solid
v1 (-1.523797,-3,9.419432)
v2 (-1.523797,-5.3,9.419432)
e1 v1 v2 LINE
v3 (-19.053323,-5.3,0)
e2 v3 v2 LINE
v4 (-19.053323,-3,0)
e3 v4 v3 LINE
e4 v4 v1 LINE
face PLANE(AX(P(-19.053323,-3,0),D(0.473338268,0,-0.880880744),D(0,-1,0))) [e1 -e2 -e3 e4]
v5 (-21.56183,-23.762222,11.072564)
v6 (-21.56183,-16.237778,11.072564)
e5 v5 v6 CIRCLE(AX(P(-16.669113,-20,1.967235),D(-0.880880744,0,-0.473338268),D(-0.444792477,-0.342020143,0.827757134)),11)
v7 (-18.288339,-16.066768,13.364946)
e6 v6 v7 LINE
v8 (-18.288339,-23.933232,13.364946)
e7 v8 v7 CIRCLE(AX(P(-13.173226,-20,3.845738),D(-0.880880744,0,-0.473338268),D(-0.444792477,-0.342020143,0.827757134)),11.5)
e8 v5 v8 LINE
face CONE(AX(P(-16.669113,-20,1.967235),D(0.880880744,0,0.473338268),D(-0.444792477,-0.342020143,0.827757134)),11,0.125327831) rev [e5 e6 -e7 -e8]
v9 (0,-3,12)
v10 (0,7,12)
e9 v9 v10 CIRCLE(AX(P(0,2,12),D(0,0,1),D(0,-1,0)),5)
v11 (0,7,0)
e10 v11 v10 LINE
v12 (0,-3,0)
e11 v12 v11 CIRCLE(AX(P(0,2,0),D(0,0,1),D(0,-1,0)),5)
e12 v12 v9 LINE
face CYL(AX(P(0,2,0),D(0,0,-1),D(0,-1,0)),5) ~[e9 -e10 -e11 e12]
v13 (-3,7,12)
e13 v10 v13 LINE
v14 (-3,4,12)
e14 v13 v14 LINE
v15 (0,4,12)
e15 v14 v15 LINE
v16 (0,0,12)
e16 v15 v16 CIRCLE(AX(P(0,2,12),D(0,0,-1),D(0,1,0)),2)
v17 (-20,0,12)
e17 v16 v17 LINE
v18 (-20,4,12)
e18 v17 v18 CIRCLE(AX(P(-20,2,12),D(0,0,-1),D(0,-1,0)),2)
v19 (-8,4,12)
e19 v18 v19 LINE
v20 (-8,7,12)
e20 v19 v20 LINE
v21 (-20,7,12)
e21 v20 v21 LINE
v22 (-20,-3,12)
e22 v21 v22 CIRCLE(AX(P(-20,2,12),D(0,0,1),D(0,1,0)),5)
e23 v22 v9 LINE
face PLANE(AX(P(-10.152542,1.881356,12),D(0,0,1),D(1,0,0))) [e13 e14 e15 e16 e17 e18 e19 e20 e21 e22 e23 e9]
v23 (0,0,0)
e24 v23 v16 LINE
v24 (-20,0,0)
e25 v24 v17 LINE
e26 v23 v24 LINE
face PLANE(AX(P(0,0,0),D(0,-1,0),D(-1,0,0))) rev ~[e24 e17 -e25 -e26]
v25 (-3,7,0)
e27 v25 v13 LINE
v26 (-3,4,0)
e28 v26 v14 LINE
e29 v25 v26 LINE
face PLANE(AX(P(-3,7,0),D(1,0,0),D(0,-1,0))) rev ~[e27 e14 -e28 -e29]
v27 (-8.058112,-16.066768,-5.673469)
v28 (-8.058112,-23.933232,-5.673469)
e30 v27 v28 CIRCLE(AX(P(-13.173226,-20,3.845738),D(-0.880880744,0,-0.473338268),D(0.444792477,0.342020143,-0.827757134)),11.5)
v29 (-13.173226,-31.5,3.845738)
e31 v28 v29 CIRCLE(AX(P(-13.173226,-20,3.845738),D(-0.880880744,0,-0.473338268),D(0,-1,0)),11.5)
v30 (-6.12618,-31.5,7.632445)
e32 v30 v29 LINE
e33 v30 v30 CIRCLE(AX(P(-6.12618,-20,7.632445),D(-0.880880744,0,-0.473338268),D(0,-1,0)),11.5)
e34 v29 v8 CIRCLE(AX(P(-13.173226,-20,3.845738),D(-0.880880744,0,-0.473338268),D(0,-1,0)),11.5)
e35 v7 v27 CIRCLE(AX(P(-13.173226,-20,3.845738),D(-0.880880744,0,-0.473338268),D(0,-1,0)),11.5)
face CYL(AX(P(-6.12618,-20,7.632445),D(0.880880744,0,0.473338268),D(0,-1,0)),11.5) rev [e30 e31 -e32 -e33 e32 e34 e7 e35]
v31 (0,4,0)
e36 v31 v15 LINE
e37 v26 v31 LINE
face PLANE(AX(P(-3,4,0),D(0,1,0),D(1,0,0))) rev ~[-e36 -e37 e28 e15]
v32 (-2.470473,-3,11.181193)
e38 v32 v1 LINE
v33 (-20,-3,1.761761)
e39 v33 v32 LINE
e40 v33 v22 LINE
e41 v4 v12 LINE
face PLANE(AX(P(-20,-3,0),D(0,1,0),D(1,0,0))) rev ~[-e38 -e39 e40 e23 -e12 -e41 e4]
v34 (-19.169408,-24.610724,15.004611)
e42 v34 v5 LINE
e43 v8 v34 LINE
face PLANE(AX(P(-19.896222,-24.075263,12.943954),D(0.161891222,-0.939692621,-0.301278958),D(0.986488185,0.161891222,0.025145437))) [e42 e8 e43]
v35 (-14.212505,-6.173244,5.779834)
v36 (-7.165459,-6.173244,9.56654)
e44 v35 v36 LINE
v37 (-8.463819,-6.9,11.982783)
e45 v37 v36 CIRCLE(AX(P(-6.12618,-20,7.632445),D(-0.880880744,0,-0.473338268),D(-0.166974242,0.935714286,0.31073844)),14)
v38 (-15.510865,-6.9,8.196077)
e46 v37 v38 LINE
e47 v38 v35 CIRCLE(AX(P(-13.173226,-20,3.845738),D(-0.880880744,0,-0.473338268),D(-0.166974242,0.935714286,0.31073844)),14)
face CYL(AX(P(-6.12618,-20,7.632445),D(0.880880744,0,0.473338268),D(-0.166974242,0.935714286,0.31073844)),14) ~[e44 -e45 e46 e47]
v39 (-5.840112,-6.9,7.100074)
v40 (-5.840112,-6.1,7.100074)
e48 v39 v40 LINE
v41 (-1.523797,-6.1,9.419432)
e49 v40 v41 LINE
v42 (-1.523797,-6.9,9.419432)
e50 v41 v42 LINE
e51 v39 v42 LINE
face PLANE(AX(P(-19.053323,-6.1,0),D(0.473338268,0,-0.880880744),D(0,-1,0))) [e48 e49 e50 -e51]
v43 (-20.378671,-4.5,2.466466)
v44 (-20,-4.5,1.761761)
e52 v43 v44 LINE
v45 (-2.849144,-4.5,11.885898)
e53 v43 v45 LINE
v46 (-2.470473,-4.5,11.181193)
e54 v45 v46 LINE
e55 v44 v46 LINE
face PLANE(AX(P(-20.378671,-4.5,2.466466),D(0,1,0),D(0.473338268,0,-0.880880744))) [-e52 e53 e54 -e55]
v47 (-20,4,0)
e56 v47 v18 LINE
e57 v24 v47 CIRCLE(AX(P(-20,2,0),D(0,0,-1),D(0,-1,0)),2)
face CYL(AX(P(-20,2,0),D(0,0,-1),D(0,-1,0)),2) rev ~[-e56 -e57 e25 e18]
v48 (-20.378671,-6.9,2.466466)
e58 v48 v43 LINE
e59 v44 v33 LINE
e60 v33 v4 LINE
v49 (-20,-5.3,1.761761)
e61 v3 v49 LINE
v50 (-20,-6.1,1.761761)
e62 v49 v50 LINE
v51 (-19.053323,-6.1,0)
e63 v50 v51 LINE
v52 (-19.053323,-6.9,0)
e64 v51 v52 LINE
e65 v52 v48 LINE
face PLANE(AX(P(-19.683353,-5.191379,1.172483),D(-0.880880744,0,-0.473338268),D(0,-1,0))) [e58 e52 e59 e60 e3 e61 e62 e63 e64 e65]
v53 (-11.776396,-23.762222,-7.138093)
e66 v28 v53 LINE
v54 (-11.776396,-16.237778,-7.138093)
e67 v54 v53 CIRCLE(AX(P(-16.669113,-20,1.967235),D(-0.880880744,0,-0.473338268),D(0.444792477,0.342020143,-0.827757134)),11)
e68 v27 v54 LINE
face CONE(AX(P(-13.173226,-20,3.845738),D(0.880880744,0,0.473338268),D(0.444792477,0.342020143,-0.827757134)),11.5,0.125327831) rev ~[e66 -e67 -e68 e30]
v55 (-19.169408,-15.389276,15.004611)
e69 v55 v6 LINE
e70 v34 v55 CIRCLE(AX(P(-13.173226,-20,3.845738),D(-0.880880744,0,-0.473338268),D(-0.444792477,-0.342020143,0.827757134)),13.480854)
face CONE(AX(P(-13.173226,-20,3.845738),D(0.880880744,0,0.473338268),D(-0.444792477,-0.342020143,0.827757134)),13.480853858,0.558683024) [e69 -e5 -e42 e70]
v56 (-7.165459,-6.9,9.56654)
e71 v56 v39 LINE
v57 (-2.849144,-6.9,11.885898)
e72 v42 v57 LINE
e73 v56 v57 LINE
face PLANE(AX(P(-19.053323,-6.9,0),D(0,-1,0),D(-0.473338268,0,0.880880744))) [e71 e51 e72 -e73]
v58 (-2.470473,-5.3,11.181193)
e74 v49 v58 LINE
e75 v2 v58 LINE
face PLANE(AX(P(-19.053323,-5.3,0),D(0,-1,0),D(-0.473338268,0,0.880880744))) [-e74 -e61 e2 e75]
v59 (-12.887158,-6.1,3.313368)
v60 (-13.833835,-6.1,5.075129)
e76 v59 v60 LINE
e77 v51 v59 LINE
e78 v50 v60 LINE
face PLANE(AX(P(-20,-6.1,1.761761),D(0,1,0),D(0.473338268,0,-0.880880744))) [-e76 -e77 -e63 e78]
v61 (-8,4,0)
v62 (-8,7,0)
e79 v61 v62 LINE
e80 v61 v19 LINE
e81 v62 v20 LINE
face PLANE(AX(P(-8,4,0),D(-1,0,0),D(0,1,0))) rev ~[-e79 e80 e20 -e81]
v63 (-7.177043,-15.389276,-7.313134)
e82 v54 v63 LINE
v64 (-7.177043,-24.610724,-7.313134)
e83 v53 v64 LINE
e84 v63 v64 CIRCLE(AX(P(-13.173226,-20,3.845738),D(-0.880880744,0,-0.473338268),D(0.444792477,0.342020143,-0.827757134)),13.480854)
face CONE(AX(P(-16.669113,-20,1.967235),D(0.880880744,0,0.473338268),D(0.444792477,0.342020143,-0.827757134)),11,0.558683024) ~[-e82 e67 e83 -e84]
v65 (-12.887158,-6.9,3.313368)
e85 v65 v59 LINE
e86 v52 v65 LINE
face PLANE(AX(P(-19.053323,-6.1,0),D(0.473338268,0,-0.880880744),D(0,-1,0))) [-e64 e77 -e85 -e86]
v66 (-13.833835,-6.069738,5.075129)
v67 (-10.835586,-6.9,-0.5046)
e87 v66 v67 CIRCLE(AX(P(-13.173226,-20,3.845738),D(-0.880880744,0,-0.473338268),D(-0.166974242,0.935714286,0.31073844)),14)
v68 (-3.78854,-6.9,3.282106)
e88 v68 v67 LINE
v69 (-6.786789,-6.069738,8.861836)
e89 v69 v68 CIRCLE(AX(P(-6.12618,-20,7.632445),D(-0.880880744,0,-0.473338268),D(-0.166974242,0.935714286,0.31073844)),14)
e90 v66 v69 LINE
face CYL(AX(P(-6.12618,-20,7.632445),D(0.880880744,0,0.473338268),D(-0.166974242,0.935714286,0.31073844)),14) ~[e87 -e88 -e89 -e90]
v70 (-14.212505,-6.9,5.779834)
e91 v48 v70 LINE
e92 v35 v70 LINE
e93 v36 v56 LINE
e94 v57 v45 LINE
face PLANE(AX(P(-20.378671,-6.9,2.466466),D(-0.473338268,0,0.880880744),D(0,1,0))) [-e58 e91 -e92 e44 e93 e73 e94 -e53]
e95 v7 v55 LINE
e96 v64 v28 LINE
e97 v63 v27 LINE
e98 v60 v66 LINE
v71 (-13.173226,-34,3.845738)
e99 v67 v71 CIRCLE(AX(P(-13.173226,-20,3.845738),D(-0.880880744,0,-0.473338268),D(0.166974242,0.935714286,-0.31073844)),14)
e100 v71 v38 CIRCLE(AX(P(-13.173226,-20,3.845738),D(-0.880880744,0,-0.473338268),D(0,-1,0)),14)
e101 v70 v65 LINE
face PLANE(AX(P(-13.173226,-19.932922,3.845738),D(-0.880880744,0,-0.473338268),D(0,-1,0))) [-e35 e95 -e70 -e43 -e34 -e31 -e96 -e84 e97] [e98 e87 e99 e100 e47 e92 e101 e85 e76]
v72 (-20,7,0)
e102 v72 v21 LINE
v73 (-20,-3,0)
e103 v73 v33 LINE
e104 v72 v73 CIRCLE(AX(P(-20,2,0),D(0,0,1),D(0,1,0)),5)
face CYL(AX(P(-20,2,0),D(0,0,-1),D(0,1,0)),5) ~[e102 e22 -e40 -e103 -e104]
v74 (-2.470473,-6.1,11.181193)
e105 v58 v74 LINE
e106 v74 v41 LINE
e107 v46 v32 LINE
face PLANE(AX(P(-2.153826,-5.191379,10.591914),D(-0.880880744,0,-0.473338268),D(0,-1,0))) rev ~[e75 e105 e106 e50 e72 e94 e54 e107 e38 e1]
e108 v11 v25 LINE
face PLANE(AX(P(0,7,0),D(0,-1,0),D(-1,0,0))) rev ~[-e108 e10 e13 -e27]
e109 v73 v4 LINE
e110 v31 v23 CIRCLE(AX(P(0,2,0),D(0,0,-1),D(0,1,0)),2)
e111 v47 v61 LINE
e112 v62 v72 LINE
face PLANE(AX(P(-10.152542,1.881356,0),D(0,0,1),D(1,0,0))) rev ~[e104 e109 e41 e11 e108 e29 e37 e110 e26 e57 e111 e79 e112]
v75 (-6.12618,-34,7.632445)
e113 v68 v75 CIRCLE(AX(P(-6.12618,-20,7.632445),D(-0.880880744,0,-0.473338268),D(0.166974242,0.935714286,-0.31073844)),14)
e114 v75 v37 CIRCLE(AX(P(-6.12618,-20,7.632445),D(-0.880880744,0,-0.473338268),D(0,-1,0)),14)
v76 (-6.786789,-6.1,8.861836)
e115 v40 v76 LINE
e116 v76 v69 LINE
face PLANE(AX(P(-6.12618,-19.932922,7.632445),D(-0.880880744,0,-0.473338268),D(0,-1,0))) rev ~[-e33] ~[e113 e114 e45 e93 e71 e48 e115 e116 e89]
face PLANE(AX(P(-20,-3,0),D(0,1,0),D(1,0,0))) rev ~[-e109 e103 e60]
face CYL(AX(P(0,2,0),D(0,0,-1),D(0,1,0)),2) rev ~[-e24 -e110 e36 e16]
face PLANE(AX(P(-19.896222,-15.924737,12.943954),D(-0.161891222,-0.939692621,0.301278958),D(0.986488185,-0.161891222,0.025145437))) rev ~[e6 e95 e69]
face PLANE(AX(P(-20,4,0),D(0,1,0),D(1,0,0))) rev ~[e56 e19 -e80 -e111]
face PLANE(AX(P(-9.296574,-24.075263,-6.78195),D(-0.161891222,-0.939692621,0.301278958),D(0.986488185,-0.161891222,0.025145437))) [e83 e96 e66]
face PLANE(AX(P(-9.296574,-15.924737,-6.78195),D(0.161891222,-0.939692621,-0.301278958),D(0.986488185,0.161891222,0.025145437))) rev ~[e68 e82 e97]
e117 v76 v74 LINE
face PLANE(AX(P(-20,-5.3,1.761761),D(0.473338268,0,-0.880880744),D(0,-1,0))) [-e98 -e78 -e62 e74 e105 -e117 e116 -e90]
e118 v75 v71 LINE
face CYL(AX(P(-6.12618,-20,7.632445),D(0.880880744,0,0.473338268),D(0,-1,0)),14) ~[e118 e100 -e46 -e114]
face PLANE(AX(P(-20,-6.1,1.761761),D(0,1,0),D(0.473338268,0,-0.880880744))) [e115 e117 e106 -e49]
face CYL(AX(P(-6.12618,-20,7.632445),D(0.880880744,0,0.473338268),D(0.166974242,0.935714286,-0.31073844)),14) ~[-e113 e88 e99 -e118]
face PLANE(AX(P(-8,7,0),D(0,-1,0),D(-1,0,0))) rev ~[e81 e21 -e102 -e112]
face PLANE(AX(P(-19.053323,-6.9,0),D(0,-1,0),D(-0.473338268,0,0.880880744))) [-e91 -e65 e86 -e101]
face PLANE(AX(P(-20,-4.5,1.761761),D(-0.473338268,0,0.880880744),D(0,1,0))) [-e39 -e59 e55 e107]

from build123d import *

# Parameters (mm, degrees)
F1_DEPTH       = 12
F5_DEPTH       = 19.9
F7_R           = 11.5
F8_DEPTH       = 8
F11_ANGLE_BACK = 20
F11_ANGLE      = 40


with BuildPart() as f1:
    # F0 (on Top) → F1 (new body)
    with BuildSketch(Plane.XY):
        with BuildLine():
            Line((0, 0), (-20, 0))
            ThreePointArc((-20, 0), (-22, 2), (-20, 4))
            Line((-20, 4), (-8, 4))
            Line((-8, 4), (-8, 7))
            Line((-8, 7), (-20, 7))
            ThreePointArc((-20, 7), (-25, 2), (-20, -3))
            Line((-20, -3), (0, -3))
            ThreePointArc((0, -3), (5, 2), (0, 7))
            Line((0, 7), (-3, 7))
            Line((-3, 7), (-3, 4))
            Line((-3, 4), (0, 4))
            ThreePointArc((0, 4), (2, 2), (0, 0))
        make_face()
    extrude(amount=F1_DEPTH)

    # F4 (on line) → F5 (join)
    with BuildSketch(Plane(origin=(-14.7844431916, 0, -7.9443702008), x_dir=(0, -1, 0), z_dir=(-0.8808807435, 0, -0.4733382677))):
        Polygon((3, 11.0186671228), (3, 9.0186671228), (5.3, 9.0186671228), (5.3, 11.0186671228), (6.1, 11.0186671228), (6.1, 9.0186671228), (6.9, 9.0186671228), (6.9, 11.8186671228), (4.5, 11.8186671228), (4.5, 11.0186671228), align=None)
    extrude(amount=-F5_DEPTH)

    # F7 (on offset) → F8 (join)
    with BuildSketch(Plane(origin=(-1.5712320387, 0, -0.8442961852), x_dir=(0, -1, 0), z_dir=(-0.8808807435, 0, -0.4733382677))):
        with BuildLine():
            ThreePointArc((34, 9.6230288318), (22.5099800796, 23.3961911411), (6.9, 14.5616521217))
            Line((6.9, 14.5616521217), (6.9, 4.6844055418))
            ThreePointArc((6.9, 4.6844055418), (22.5099800796, -4.1501334776), (34, 9.6230288318))
        make_face()
        with Locations((20, 9.6230288318)):
            Circle(F7_R, mode=Mode.SUBTRACT)
        with BuildLine():
            Line((6.9, 4.6844055418), (6.9, 14.5616521217))
            ThreePointArc((6.9, 14.5616521217), (6, 9.6230288318), (6.9, 4.6844055418))
        make_face()
    extrude(amount=F8_DEPTH)

    # F10 (on offset) → F11 (revolve)
    with BuildSketch(Plane.XZ.offset(20), mode=Mode.PRIVATE) as f11_sk:
        Polygon((-6.7922217721, -8.029286104), (-7.7298357056, -6.2843900851), (-11.4623919126, -7.7224527269), align=None)
        Polygon((-21.8758338022, 11.6569236308), (-18.6166158629, 13.9758670161), (-19.5542297964, 15.720763035), align=None)
    revolve(f11_sk.sketch.rotate(Axis((-15.3602525801, -20, 2.6705470646), (-0.8808807435, 0, -0.4733382677)), -F11_ANGLE_BACK), axis=Axis((-15.3602525801, -20, 2.6705470646), (-0.8808807435, 0, -0.4733382677)), revolution_arc=F11_ANGLE)


solid = f1.part
